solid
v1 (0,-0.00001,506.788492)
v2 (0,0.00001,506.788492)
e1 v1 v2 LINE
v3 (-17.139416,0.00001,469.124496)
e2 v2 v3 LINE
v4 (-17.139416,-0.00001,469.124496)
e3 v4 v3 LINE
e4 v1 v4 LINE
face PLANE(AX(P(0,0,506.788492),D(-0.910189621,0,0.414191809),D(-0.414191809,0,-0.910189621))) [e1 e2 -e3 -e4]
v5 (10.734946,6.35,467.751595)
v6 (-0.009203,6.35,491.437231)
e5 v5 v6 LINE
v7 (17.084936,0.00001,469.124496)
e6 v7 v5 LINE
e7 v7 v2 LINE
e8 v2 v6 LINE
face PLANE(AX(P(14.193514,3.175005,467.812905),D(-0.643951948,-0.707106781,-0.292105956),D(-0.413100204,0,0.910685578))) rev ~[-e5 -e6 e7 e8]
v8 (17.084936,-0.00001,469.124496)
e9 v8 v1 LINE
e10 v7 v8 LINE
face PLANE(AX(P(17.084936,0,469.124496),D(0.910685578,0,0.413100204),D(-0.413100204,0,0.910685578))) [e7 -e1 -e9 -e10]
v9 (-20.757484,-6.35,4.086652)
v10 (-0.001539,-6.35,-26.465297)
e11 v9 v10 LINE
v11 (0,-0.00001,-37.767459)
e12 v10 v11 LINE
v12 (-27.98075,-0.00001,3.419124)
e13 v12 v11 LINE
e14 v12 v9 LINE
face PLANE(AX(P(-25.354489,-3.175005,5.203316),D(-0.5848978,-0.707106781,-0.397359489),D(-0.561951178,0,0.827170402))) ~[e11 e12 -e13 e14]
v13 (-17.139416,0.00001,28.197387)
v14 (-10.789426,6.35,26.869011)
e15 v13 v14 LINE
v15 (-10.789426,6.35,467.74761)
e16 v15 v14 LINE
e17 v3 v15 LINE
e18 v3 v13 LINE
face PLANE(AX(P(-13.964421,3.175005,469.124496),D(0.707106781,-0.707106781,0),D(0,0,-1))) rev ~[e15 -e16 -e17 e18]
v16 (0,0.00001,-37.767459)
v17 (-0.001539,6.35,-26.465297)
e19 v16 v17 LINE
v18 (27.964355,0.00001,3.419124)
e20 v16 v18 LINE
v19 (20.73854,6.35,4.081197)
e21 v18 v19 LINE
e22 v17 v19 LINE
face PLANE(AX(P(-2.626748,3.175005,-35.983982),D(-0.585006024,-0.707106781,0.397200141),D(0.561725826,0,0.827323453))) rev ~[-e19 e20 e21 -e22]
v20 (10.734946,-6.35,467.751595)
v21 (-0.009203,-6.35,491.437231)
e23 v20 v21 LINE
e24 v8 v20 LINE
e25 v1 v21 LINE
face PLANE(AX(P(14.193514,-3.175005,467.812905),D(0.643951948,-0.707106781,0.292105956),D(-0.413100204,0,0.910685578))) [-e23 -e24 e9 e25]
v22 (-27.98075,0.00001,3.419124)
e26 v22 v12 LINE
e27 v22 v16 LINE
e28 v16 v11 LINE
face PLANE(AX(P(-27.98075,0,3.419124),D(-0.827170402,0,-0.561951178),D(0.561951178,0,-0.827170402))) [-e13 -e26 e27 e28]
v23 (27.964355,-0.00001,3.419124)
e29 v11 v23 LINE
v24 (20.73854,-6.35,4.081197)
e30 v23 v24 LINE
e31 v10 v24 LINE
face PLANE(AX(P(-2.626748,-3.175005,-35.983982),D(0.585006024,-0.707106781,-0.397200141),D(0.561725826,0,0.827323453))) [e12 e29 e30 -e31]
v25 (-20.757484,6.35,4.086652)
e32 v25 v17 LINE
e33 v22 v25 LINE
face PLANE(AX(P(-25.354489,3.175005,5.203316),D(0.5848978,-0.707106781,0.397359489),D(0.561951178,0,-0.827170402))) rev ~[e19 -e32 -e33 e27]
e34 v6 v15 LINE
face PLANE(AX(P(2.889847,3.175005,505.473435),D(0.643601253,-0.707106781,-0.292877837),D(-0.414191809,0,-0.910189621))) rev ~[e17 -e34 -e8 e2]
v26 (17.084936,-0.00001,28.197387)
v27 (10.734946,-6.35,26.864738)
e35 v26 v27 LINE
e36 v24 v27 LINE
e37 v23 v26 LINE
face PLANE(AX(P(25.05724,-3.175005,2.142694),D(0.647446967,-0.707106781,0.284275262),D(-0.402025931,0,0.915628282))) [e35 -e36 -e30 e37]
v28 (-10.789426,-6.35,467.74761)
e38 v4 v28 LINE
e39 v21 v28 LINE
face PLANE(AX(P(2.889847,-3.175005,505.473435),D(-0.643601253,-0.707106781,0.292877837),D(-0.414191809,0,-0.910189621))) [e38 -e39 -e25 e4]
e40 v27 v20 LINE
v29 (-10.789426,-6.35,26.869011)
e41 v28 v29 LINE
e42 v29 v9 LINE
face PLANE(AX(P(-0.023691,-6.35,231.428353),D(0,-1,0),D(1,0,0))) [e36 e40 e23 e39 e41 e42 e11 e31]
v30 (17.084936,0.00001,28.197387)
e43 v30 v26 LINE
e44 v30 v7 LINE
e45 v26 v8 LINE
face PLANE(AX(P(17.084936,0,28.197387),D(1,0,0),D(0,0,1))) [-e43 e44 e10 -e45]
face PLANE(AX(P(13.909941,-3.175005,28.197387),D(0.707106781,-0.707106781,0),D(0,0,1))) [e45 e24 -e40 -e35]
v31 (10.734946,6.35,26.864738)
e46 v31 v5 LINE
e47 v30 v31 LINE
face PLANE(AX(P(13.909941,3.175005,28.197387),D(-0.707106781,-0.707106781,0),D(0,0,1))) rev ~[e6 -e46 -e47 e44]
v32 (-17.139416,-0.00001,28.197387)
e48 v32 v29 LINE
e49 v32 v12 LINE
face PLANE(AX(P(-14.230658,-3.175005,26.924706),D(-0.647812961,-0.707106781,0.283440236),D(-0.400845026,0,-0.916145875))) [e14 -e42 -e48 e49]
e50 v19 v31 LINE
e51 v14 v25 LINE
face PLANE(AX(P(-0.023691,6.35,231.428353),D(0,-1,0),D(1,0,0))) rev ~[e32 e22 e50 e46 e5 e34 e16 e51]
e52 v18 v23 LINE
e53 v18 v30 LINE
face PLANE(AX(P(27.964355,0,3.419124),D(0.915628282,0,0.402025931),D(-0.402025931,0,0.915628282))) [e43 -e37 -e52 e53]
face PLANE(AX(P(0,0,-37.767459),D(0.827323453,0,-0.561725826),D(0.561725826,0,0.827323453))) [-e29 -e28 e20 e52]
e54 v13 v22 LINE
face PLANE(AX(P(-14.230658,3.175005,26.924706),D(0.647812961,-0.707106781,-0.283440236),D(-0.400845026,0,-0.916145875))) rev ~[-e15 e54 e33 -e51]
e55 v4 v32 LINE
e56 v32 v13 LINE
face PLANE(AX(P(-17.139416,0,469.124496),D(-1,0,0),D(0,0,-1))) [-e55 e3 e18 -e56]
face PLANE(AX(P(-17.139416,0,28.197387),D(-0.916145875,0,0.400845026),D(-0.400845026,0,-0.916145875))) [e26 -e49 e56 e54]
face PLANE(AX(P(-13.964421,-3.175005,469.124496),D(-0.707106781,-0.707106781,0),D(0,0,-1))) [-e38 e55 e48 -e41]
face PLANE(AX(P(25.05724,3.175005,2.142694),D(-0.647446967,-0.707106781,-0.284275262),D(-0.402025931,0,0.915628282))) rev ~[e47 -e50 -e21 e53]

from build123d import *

# Parameters (mm, degrees)
F1_DEPTH = 6.35
F2_DEPTH = 6.35
F3_SIZE2 = 6.34999
F3_SIZE  = 6.34999


# Not quite as in the source:
# - a fillet or chamfer is up to 0.001 mm smaller than in the source, because OpenCascade refuses the exact size


with BuildPart() as f1:
    # F0 (on Front) → F1 (new body)
    with BuildSketch(Plane.XZ):
        Polygon((-17.139416188, 28.1973872334), (-27.9807504267, 3.4191238228), (0, -37.7674587071), (27.964355424, 3.4191238228), (17.08493568, 28.1973872334), (17.08493568, 469.1244959831), (0, 506.7884922028), (-17.139416188, 469.1244959831), align=None)
    extrude(amount=F1_DEPTH)

    # F2 (add): a face of the model
    f2_faces = [f1.faces().sort_by_distance(p)[0] for p in [
        (-0.0248835797, 0, 225.9211420486),
    ]]
    extrude(f2_faces, amount=F2_DEPTH)

    # F3 (size 6.35 and 6.35 in the source; OpenCascade refuses exactly that, so slightly less here)
    f3_edges = [f1.edges().sort_by_distance(p)[0] for p in [
        (-22.560083, -6.35, 15.808256),
        (-13.990375, -6.35, -17.174167),
        (13.982178, -6.35, -17.174167),
        (22.524646, -6.35, 15.808256),
        (17.084936, -6.35, 248.660942),
        (8.542468, -6.35, 487.956494),
        (-8.569708, -6.35, 487.956494),
        (-17.139416, -6.35, 248.660942),
        (-22.560083, 6.35, 15.808256),
        (-13.990375, 6.35, -17.174167),
        (13.982178, 6.35, -17.174167),
        (22.524646, 6.35, 15.808256),
        (17.084936, 6.35, 248.660942),
        (8.542468, 6.35, 487.956494),
        (-8.569708, 6.35, 487.956494),
        (-17.139416, 6.35, 248.660942),
    ]]
    chamfer(f3_edges, length=F3_SIZE, length2=F3_SIZE2)


solid = f1.part
